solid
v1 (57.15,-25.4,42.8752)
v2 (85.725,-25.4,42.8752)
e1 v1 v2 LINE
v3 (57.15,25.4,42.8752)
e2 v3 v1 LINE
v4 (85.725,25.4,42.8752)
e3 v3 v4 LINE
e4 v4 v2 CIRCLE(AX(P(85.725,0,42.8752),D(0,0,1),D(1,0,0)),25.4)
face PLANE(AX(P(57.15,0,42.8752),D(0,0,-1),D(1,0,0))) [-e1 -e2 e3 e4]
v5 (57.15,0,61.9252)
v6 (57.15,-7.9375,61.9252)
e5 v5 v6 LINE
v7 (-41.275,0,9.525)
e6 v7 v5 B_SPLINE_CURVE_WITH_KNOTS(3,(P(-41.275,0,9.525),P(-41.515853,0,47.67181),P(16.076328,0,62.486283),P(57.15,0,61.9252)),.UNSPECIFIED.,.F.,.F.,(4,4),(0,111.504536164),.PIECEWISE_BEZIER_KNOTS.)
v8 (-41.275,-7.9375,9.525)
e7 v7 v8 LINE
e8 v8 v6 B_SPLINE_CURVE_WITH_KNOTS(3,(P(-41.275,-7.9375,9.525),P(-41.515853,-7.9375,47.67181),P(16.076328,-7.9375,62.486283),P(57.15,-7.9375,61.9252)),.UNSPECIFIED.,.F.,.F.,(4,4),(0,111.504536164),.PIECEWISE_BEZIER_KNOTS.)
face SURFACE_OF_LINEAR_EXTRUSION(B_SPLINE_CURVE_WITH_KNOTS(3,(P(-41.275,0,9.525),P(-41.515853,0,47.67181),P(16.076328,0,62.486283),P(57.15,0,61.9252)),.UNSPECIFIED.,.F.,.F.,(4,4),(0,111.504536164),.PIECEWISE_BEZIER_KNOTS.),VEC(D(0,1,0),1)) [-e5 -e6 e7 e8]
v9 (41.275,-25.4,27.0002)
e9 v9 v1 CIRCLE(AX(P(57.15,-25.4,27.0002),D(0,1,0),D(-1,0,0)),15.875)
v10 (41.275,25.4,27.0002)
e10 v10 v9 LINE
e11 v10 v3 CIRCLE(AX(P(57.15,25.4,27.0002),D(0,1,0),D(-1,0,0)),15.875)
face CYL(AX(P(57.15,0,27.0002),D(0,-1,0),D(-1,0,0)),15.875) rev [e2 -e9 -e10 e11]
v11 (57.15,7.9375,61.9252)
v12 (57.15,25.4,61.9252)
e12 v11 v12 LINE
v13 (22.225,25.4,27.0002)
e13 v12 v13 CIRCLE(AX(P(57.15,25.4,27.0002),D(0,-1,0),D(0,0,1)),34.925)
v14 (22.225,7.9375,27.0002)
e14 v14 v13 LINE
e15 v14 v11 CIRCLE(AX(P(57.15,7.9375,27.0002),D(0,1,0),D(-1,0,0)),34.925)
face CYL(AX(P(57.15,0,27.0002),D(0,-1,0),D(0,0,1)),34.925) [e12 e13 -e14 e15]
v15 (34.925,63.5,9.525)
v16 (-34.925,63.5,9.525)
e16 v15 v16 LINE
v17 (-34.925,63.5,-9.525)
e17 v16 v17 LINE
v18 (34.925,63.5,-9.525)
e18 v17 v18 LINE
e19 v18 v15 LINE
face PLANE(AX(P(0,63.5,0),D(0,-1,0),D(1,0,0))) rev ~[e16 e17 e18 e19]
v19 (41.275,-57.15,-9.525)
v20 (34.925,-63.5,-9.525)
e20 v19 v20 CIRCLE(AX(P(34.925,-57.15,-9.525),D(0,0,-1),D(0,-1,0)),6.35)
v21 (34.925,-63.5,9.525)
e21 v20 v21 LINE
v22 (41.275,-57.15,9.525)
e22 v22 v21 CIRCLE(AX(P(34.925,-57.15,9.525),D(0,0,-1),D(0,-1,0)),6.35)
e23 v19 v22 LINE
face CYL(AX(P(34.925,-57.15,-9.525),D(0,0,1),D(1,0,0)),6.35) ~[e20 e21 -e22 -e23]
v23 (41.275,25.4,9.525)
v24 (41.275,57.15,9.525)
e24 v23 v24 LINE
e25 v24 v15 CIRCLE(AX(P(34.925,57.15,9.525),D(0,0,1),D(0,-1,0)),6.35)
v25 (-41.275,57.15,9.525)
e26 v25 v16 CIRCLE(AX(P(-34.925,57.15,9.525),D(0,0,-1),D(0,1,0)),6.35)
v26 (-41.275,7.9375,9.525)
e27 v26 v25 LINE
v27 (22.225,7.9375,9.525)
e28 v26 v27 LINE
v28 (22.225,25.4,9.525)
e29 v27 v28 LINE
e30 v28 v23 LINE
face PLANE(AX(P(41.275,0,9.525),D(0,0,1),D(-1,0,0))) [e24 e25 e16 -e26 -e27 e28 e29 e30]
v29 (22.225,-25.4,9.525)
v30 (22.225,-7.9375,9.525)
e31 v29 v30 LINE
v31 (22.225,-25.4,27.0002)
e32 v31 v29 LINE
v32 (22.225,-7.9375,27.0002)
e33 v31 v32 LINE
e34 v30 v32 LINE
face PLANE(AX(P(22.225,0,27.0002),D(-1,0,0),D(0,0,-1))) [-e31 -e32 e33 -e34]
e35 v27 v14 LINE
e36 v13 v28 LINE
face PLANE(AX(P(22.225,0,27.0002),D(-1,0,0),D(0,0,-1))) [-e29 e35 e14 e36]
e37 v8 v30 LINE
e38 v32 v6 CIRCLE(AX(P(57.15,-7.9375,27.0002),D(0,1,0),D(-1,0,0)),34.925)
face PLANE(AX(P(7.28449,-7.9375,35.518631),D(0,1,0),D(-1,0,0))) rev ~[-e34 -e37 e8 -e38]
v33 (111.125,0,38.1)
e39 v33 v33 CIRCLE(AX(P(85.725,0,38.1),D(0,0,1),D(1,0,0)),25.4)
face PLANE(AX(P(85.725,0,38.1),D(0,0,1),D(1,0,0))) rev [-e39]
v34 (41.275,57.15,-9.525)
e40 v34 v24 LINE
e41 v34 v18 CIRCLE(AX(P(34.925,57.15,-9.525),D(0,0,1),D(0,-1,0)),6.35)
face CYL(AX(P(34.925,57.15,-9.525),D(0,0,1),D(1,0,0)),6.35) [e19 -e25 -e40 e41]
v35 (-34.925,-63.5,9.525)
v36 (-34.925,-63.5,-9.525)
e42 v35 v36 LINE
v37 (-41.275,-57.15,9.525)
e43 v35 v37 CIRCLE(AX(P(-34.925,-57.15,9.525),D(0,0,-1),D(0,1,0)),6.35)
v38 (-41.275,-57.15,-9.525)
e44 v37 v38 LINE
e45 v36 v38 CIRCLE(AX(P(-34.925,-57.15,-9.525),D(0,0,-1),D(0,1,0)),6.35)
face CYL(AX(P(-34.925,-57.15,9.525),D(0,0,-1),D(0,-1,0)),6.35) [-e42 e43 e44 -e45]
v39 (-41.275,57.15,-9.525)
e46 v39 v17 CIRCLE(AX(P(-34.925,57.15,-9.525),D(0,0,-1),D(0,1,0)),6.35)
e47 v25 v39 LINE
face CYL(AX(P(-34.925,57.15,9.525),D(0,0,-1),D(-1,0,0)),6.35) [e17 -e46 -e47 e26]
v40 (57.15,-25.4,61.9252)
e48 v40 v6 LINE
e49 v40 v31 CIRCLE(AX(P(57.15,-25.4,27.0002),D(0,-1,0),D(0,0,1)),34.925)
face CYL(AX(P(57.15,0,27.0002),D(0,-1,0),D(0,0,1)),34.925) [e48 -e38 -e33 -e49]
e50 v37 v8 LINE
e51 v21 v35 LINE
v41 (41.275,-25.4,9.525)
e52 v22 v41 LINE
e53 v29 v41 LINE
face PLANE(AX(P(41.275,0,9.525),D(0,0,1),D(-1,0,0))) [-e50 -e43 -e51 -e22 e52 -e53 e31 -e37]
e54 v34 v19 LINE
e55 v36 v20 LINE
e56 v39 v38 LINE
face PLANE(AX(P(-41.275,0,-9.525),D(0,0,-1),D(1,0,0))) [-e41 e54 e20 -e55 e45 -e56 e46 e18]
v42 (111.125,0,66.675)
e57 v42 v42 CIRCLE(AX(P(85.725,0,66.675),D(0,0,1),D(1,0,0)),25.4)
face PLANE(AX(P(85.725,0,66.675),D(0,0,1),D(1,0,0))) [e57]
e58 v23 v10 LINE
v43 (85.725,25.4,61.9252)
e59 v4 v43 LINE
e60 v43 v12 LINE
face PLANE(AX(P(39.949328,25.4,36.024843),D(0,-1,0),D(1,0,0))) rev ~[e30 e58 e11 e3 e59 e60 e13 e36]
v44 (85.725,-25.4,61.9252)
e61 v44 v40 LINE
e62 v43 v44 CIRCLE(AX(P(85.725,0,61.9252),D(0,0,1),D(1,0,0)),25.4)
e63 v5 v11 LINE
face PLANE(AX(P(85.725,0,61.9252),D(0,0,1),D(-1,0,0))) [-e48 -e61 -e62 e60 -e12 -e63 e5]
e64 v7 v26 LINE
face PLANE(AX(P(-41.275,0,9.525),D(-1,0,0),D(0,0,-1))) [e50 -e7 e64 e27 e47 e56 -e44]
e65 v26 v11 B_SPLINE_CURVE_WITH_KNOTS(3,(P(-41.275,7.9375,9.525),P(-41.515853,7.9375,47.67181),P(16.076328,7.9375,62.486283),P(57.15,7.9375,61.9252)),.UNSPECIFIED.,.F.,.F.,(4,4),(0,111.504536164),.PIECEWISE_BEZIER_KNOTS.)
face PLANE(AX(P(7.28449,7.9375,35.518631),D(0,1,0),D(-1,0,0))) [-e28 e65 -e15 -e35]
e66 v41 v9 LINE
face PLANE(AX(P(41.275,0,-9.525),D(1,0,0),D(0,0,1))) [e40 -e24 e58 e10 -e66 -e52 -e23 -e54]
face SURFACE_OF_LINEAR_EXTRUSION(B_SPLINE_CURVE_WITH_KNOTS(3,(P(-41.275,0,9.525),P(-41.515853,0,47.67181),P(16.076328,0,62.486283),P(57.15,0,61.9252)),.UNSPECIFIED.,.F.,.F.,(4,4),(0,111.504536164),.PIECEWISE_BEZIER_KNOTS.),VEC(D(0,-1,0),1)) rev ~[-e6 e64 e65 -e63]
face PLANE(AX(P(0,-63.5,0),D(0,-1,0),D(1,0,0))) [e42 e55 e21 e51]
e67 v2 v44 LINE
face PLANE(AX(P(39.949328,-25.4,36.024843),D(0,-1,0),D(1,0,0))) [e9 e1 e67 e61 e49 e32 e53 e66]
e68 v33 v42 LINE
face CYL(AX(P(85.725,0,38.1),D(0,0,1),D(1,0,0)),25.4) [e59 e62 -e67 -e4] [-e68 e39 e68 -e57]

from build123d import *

# Parameters (mm, degrees)
F1_DEPTH = 63.5
F0_W     = 25.4
F0_H     = 19.05
F2_DEPTH = 25.4
F3_DEPTH = 7.9375
F5_R     = 6.35


# Not quite as in the source:
# - a feature names something its author has since deleted; it is built from what else it names


with BuildPart() as f1:
    # F0 (on Front) → F1 (new body, symmetric)
    with BuildSketch(Plane.XZ):
        Polygon((-41.275, 9.525), (-41.275, -9.525), (41.275, -9.525), (41.275, 9.525), (22.225, 9.525), align=None)
    extrude(amount=F1_DEPTH, both=True)

    # F0 (on Front) → F2 (join, symmetric)
    with BuildSketch(Plane.XZ):
        with BuildLine():
            Line((22.225, 9.525), (41.275, 9.525))
            Line((41.275, 9.525), (41.275, 27.0002))
            ThreePointArc((41.275, 27.0002), (45.9246798487, 38.2255201513), (57.15, 42.8752))
            Line((57.15, 42.8752), (60.325, 42.8752))
            Line((60.325, 42.8752), (60.325, 61.9252))
            Line((60.325, 61.9252), (57.15, 61.9252))
            ThreePointArc((57.15, 61.9252), (32.4542956671, 51.6959043329), (22.225, 27.0002))
            Line((22.225, 27.0002), (22.225, 9.525))
        make_face()
        with Locations((73.025, 52.4002)):
            Rectangle(F0_W, F0_H)
    extrude(amount=F2_DEPTH, both=True)

    # F0 (on Front) → F3 (join, symmetric)
    with BuildSketch(Plane.XZ):
        with BuildLine():
            add(Edge.make_bspline(
                [(-41.275, 9.525), (-41.515853256, 47.6718097925), (16.0763282329, 62.4862834811), (57.15, 61.9252)],
                knots=[0, 0, 0, 0, 111.5045361635, 111.5045361635, 111.5045361635, 111.5045361635], degree=3))
            Line((-41.275, 9.525), (22.225, 9.525))
            Line((22.225, 9.525), (22.225, 27.0002))
            ThreePointArc((22.225, 27.0002), (32.4542956671, 51.6959043329), (57.15, 61.9252))
        make_face()
    extrude(amount=F3_DEPTH, both=True)

    # F0 (on Front) → F4 (revolve)
    with BuildSketch(Plane.XZ):
        Polygon((85.725, 66.675), (85.725, 61.9252), (85.725, 42.8752), (85.725, 38.1), (111.125, 38.1), (111.125, 66.675), align=None)
    revolve(axis=Axis((85.725, 0, 52.3875), (0, 0, 1)))

    # F5
    f5_edges = [f1.edges().sort_by_distance(p)[0] for p in [
        (-41.275, -63.5, 0),
        (41.275, -63.5, 0),
        (41.275, 63.5, 0),
        (-41.275, 63.5, 0),
    ]]
    fillet(f5_edges, radius=F5_R)


solid = f1.part
